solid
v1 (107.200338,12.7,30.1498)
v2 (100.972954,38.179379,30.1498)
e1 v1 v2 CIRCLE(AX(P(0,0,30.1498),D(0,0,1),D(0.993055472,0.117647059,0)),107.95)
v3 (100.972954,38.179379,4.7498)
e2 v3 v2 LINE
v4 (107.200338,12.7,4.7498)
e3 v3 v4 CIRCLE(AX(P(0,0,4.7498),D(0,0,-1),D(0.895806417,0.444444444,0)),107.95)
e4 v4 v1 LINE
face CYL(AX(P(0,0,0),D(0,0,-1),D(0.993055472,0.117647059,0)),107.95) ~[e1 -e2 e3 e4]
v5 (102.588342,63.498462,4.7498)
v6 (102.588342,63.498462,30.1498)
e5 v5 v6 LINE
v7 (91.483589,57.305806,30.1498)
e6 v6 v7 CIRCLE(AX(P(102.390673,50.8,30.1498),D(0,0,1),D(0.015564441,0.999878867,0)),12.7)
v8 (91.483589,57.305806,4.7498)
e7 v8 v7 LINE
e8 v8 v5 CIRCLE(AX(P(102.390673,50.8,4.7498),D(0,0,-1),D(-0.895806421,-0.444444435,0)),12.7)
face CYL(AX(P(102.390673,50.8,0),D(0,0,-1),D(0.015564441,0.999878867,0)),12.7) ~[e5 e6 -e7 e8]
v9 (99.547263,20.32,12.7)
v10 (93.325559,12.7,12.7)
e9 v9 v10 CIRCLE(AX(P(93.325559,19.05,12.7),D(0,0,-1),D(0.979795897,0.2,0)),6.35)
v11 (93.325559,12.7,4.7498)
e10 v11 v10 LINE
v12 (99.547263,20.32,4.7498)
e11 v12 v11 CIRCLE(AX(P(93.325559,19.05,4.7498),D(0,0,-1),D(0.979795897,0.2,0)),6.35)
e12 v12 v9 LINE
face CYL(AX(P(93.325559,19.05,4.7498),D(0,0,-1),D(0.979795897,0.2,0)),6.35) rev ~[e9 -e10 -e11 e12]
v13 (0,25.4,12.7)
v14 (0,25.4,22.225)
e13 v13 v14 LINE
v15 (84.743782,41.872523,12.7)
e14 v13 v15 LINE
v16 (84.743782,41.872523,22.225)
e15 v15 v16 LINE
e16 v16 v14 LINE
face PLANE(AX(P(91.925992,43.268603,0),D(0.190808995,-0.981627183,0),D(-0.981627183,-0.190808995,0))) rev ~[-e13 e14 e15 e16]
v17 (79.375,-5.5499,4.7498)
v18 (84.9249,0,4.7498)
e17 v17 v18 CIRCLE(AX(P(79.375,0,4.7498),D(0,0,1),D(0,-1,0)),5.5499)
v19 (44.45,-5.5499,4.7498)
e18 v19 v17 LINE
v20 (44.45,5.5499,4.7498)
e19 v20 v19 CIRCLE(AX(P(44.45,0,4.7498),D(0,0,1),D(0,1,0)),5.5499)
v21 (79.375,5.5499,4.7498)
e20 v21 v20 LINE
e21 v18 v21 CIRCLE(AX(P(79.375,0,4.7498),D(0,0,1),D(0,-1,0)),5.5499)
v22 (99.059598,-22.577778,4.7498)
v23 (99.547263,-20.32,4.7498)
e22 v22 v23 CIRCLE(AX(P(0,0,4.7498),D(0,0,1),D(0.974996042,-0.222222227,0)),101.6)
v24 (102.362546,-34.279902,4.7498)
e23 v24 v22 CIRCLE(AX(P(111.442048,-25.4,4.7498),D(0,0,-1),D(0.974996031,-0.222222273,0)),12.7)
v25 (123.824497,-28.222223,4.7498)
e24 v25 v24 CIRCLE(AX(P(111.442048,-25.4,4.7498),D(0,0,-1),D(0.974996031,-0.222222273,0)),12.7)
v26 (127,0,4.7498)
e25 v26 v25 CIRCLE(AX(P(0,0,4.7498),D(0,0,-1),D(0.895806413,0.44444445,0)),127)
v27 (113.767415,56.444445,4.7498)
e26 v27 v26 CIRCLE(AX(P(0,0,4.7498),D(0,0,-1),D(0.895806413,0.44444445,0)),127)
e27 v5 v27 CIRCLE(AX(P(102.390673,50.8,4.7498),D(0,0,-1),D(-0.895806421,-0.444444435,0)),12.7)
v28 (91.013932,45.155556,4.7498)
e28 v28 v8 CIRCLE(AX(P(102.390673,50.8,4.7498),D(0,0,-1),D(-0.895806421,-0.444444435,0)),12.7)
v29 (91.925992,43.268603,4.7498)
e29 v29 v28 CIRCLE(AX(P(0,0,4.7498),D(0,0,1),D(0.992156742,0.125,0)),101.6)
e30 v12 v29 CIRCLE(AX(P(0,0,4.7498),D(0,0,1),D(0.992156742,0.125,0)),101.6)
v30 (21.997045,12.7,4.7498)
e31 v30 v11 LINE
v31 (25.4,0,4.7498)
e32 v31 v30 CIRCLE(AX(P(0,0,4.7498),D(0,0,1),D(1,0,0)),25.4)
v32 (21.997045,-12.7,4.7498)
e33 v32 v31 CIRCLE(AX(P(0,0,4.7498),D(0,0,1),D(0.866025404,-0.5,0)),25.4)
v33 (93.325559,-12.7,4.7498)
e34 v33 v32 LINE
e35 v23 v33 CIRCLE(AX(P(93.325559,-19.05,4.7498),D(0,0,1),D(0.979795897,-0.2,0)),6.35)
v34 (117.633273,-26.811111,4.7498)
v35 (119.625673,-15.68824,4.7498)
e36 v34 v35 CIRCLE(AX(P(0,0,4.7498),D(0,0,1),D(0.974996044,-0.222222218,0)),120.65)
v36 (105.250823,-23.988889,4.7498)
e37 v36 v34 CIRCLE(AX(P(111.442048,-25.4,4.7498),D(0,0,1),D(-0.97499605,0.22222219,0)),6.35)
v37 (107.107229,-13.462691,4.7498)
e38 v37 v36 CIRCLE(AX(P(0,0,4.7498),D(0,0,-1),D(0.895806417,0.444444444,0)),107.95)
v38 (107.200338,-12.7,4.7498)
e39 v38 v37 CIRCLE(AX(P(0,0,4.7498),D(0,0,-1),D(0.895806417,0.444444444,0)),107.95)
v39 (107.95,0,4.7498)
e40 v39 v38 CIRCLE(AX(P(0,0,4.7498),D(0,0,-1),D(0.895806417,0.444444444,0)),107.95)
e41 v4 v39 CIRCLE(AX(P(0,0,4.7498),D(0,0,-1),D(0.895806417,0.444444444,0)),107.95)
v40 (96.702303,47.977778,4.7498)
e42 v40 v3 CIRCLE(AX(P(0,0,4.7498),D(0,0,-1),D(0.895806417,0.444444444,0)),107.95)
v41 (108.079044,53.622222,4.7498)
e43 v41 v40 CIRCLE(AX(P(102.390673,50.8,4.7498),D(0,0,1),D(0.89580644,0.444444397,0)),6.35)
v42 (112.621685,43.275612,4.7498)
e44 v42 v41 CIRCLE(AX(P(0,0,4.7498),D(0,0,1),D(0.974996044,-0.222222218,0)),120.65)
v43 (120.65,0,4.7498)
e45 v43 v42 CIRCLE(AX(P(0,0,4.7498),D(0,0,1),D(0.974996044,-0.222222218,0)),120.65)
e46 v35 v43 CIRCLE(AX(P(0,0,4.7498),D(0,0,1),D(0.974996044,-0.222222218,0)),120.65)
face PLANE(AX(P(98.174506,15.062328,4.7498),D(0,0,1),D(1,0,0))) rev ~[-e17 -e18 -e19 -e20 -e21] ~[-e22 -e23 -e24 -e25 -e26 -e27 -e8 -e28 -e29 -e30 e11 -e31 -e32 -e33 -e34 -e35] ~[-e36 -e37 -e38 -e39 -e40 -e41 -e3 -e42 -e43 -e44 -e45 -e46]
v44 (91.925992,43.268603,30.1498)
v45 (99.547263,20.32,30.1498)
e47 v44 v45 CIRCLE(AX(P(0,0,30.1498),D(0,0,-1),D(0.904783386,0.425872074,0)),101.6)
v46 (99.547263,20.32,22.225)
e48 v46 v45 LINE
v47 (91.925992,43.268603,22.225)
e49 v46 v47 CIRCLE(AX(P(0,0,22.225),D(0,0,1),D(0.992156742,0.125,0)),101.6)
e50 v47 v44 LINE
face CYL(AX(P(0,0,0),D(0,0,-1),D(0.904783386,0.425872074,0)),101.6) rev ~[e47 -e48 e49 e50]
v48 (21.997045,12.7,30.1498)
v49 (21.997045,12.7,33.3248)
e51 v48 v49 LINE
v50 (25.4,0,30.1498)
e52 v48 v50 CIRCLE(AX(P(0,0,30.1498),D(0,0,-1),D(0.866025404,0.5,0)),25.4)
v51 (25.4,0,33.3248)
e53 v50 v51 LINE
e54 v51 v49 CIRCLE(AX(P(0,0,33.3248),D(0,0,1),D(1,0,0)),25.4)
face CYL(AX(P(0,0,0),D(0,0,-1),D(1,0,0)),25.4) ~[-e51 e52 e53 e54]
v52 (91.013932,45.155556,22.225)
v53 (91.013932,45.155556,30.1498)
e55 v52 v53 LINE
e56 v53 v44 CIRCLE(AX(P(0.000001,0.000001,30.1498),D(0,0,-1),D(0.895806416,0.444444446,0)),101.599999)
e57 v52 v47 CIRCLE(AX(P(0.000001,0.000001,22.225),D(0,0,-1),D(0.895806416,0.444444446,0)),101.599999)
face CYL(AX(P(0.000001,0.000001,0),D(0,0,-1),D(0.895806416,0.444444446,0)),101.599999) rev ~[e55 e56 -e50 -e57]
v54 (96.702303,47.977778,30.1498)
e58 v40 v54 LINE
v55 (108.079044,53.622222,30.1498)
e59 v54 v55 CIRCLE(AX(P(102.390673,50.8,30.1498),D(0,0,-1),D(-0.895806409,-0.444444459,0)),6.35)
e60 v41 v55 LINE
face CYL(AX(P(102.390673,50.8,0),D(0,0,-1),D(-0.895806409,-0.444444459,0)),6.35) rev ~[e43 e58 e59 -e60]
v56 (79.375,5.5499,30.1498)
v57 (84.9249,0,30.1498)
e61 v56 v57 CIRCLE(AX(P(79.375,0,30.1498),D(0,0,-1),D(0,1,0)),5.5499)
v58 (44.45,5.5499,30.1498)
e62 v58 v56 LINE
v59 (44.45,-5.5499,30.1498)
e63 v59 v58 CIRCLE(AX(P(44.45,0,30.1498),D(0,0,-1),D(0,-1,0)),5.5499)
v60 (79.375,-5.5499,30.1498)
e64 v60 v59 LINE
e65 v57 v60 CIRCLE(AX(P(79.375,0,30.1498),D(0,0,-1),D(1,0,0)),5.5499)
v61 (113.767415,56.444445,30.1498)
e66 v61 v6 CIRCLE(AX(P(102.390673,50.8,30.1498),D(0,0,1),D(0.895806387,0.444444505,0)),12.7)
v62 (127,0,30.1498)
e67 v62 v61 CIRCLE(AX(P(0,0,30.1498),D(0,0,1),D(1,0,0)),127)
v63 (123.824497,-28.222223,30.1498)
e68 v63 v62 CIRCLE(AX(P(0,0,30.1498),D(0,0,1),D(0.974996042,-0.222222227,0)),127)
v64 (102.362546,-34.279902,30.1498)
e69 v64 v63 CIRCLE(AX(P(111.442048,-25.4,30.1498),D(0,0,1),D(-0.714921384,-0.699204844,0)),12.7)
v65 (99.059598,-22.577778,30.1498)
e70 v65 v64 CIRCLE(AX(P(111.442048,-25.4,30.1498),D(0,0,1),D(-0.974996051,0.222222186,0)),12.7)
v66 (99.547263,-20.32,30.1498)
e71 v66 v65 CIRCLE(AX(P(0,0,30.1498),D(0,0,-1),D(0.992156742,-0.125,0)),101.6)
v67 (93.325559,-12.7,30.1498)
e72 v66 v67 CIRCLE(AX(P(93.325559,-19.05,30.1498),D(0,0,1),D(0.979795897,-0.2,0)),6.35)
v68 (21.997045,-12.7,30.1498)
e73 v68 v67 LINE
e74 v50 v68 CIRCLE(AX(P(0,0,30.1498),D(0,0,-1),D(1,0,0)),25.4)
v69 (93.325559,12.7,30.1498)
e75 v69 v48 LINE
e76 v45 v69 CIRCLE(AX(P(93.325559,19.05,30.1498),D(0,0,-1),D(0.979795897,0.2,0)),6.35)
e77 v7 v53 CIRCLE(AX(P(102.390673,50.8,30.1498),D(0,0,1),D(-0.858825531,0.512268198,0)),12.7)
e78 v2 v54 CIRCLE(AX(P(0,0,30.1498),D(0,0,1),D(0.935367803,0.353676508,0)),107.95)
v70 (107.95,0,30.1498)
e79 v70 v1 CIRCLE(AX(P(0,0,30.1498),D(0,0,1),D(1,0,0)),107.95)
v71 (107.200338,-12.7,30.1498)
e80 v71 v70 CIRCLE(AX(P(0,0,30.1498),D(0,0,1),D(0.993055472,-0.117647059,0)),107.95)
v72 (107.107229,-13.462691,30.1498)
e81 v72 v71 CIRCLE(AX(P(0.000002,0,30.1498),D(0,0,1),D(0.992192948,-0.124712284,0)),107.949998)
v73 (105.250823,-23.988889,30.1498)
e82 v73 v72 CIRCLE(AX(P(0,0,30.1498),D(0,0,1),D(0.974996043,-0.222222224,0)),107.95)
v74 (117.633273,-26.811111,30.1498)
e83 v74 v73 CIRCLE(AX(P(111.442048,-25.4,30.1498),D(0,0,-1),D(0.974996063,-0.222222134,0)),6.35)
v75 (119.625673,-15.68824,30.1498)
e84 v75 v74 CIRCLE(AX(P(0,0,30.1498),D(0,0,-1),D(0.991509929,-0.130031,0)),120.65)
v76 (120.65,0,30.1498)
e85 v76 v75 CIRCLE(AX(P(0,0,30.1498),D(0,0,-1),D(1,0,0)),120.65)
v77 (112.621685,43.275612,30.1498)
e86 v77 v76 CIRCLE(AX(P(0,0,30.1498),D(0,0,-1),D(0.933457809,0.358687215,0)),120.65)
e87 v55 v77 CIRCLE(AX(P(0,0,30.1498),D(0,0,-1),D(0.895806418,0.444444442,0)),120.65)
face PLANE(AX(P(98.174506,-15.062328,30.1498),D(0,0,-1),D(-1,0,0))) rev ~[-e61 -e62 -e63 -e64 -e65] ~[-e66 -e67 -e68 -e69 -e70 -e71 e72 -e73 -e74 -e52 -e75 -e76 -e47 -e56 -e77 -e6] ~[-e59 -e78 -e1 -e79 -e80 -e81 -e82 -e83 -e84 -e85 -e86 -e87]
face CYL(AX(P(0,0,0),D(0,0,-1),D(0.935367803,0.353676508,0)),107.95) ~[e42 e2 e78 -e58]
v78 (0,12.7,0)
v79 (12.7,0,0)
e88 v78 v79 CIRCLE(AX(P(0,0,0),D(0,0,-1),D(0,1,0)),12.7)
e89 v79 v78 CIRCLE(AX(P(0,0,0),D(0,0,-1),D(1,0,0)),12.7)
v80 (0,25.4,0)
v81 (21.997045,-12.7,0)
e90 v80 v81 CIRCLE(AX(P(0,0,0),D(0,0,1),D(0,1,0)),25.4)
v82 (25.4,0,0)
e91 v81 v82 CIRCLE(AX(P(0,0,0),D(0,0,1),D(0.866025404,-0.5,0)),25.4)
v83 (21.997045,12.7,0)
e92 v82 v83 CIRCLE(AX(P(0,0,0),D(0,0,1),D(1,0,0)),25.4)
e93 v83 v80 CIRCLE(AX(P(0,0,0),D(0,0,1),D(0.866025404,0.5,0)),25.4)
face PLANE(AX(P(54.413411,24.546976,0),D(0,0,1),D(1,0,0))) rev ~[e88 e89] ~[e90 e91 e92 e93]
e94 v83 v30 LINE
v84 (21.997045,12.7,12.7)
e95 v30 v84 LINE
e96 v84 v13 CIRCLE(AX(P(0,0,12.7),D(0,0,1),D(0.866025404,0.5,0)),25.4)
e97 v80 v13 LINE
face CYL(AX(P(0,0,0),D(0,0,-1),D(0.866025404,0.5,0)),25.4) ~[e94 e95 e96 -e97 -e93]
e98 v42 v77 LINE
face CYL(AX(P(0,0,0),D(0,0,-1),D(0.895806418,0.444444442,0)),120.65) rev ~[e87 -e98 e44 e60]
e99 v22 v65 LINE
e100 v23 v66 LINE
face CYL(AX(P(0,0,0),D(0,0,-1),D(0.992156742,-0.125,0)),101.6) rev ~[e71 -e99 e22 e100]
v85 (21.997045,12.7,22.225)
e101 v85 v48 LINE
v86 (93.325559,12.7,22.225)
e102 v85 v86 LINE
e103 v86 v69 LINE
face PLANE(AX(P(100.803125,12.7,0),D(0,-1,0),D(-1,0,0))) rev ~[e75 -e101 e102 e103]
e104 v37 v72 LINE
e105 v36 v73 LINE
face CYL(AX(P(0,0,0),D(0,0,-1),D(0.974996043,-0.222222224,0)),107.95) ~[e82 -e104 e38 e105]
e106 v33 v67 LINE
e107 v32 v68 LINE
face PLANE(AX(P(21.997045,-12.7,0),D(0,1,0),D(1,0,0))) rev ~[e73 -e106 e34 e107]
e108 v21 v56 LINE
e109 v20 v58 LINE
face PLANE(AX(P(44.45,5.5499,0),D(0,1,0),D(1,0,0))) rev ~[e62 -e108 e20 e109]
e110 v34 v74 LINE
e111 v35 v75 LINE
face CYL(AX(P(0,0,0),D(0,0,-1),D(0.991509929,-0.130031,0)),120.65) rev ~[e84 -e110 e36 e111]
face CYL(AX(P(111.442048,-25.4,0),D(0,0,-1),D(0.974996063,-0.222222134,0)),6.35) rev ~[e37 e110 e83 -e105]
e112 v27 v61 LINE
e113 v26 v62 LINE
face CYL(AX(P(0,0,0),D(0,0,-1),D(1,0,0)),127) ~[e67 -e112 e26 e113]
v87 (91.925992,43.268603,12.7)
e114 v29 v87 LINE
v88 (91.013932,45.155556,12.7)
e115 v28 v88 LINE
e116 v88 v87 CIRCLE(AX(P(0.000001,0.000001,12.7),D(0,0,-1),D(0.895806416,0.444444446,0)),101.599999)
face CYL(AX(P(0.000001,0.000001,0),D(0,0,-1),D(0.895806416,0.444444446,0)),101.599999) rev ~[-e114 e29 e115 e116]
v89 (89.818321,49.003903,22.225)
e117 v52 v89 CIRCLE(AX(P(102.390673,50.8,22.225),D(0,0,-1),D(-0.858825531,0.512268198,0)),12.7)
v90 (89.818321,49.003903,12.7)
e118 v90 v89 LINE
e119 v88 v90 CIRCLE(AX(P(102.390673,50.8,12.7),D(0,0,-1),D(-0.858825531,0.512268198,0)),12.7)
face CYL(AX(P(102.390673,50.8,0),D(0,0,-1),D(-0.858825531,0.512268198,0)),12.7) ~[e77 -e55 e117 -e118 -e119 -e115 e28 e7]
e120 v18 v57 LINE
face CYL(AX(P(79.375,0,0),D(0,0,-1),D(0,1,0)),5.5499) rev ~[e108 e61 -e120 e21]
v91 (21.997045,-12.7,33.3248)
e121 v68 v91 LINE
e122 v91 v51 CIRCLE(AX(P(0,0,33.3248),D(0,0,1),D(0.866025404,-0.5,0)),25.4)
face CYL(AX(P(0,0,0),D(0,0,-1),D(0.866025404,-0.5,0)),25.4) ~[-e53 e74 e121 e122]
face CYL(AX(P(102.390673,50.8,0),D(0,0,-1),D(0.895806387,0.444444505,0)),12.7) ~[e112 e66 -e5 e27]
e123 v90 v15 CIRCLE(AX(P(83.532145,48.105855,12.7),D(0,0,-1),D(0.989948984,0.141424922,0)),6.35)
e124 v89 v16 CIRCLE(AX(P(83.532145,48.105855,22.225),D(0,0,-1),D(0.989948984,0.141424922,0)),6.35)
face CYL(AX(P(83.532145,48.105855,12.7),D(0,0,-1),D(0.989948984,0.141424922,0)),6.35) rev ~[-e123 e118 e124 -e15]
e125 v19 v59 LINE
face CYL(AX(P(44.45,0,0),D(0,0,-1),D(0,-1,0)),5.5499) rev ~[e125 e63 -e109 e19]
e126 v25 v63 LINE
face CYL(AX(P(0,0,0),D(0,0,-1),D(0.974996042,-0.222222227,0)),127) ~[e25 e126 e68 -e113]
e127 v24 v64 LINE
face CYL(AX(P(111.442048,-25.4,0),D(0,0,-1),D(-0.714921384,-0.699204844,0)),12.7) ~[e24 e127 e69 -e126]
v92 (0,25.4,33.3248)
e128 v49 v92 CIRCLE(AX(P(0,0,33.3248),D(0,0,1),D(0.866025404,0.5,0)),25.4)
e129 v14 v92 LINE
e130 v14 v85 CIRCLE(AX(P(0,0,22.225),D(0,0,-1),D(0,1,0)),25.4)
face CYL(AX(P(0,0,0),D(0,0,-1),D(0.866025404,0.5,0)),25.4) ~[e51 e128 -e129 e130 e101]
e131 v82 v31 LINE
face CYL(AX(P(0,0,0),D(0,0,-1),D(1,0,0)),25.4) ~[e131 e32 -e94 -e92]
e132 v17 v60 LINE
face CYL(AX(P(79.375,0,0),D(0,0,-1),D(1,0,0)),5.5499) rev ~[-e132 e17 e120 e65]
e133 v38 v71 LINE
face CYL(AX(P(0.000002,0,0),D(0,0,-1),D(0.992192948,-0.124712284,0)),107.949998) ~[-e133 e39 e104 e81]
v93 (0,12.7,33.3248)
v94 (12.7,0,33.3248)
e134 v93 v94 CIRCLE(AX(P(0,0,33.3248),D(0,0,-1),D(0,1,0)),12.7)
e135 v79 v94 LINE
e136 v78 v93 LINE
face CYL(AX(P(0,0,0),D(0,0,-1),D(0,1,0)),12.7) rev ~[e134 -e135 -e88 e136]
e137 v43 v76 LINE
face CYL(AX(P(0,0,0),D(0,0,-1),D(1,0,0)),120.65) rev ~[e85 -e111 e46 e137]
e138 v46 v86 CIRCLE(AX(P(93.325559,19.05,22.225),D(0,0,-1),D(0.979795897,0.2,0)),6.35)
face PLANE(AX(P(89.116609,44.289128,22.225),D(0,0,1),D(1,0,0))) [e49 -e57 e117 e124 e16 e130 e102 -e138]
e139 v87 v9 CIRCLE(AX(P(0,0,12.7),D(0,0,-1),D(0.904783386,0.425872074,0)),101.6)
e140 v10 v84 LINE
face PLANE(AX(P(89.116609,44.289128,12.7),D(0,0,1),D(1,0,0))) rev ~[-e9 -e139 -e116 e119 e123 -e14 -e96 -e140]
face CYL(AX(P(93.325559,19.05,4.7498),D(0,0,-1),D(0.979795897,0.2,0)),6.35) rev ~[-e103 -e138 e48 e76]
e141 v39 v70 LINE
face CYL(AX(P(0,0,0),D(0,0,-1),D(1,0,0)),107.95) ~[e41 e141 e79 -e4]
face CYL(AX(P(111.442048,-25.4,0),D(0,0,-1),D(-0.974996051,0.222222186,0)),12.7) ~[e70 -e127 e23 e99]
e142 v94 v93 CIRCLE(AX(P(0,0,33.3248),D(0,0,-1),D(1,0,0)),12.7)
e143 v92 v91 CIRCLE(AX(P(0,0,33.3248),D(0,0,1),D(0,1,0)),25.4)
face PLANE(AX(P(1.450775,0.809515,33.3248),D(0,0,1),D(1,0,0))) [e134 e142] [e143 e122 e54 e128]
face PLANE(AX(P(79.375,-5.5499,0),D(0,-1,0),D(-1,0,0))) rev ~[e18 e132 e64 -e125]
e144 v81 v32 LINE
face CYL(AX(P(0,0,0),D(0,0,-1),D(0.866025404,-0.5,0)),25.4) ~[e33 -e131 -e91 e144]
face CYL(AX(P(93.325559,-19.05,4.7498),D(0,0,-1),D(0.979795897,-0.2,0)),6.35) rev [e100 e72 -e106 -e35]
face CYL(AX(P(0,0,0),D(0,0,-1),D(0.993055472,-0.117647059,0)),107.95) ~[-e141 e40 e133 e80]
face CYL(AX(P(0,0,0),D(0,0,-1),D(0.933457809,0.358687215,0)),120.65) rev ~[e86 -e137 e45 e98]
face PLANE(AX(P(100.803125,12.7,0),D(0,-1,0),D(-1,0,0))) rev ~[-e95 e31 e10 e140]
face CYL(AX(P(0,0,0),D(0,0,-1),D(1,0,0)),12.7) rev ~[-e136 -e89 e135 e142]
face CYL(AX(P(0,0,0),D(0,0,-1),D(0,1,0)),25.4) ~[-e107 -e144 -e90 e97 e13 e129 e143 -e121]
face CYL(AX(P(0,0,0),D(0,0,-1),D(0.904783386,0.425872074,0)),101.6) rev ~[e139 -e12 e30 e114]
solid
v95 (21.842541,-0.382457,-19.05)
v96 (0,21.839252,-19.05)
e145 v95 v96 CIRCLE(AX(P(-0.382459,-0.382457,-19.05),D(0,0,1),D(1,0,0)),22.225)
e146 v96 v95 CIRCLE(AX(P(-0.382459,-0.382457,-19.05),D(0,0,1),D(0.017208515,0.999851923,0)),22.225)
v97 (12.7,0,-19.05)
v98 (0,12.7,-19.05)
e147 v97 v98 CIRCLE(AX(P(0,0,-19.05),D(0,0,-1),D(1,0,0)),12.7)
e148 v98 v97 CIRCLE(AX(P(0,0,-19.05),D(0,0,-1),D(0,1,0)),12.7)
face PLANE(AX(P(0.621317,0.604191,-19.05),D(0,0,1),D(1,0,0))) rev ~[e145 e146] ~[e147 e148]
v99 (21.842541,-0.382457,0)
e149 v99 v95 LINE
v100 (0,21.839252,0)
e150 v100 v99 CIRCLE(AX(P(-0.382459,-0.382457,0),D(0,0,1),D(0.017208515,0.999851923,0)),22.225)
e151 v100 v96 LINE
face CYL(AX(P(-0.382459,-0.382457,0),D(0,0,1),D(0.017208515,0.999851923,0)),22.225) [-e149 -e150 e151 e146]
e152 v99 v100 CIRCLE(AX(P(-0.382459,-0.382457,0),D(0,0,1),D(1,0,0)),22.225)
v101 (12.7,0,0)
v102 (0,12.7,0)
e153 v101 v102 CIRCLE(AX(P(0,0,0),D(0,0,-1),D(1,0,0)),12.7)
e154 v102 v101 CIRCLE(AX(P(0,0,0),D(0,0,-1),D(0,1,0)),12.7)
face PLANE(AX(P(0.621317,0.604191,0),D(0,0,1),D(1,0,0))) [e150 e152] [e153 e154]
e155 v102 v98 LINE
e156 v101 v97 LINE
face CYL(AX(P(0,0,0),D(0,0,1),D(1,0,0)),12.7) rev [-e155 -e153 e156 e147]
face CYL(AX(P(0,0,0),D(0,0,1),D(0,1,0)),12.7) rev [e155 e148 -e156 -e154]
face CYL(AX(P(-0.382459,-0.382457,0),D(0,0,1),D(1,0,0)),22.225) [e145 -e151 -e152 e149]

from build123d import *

# Parameters (mm, degrees)
F1_DEPTH     = 33.3248
F2_DEPTH     = 19.05
F3_DEPTH     = 30.1498
F5_DEPTH     = 4.7498
F6_DEPTH     = 22.225
F8_DEPTH     = 12.7
F9_T1_DEPTH  = 9.525
F9_T3_DEPTH  = 25.4
F9_T8_DEPTH  = 27.2571917505
F9_T13_DEPTH = 27.2317917505


# Not quite as in the source:
# - a fillet or chamfer that OpenCascade refuses, or shapes differently, is made with other operations: its cross-section is extruded or revolved along the edge and cut away or added


with BuildPart() as f1:
    # F0 (on Top) → F1 (new body)
    with BuildSketch(Plane.XY):
        with BuildLine():
            ThreePointArc((21.9970452561, 12.7), (12.7, 21.9970452561), (0, 25.4))
            ThreePointArc((0, 25.4), (-21.9970452561, -12.7), (21.9970452561, -12.7))
            ThreePointArc((21.9970452561, -12.7), (24.5345159877, -6.5740037456), (25.4, 0))
            ThreePointArc((25.4, 0), (24.5345159877, 6.5740037456), (21.9970452561, 12.7))
        make_face()
        with BuildLine():
            ThreePointArc((21.8425407432, -0.3824569867), (-16.232550455, -15.9620986388), (0, 21.8392519916))
            ThreePointArc((0, 21.8392519916), (15.4676319414, 15.1971846654), (21.8425407432, -0.3824569867))
        make_face(mode=Mode.SUBTRACT)
        with BuildLine():
            ThreePointArc((21.8425407432, -0.3824569867), (15.4676319414, 15.1971846654), (0, 21.8392519916))
            ThreePointArc((0, 21.8392519916), (-16.232550455, -15.9620986388), (21.8425407432, -0.3824569867))
        make_face()
        with BuildLine():
            ThreePointArc((0, 12.7), (8.9802561211, 8.9802561211), (12.7, 0))
            ThreePointArc((12.7, 0), (-8.9802561211, -8.9802561211), (0, 12.7))
        make_face(mode=Mode.SUBTRACT)
    extrude(amount=F1_DEPTH)

    # F0 (on Top) → F3 (join)
    with BuildSketch(Plane.XY):
        with BuildLine():
            Line((25.4, 12.7), (21.9970452561, 12.7))
            ThreePointArc((21.9970452561, 12.7), (24.5345159877, 6.5740037456), (25.4, 0))
            ThreePointArc((25.4, 0), (24.5345159877, -6.5740037456), (21.9970452561, -12.7))
            Line((21.9970452561, -12.7), (25.4, -12.7))
            Line((25.4, -12.7), (100.8031249516, -12.7))
            ThreePointArc((100.8031249516, -12.7), (101.4005855384, -6.3624879144), (101.6, 0))
            ThreePointArc((101.6, 0), (101.4005855384, 6.3624879144), (100.8031249516, 12.7))
            Line((100.8031249516, 12.7), (25.4, 12.7))
        make_face()
        with BuildLine():
            ThreePointArc((44.45, -5.5499), (38.9001, 0), (44.45, 5.5499))
            Line((44.45, 5.5499), (79.375, 5.5499))
            ThreePointArc((79.375, 5.5499), (83.2993719249, 3.9243719249), (84.9249, 0))
            ThreePointArc((84.9249, 0), (83.2993719249, -3.9243719249), (79.375, -5.5499))
            Line((79.375, -5.5499), (44.45, -5.5499))
        make_face(mode=Mode.SUBTRACT)
        with BuildLine():
            Line((107.2003381525, 12.7), (100.8031249516, 12.7))
            ThreePointArc((100.8031249516, 12.7), (101.4005855384, 6.3624879144), (101.6, 0))
            ThreePointArc((101.6, 0), (101.4005855384, -6.3624879144), (100.8031249516, -12.7))
            Line((100.8031249516, -12.7), (107.2003381525, -12.7))
            ThreePointArc((107.2003381525, -12.7), (107.762421566, -6.3610532321), (107.95, 0))
            ThreePointArc((107.95, 0), (107.762421566, 6.3610532321), (107.2003381525, 12.7))
        make_face()
        with BuildLine():
            ThreePointArc((91.0139318516, 45.1555556815), (91.4748276183, 44.2144310402), (91.9259920573, 43.2686027539))
            ThreePointArc((91.9259920573, 43.2686027539), (97.5691447351, 28.3341136382), (100.8031249516, 12.7))
            Line((100.8031249516, 12.7), (107.2003381525, 12.7))
            ThreePointArc((107.2003381525, 12.7), (104.8633855035, 25.6295314189), (100.9729543694, 38.1793790668))
            ThreePointArc((100.9729543694, 38.1793790668), (95.1042946416, 40.3981403326), (91.0139318516, 45.1555556815))
        make_face()
        with BuildLine():
            ThreePointArc((91.4835891574, 57.3058061184), (89.7001505826, 51.2905410623), (91.0139318516, 45.1555556815))
            ThreePointArc((91.0139318516, 45.1555556815), (95.1042946416, 40.3981403326), (100.9729543694, 38.1793790668))
            ThreePointArc((100.9729543694, 38.1793790668), (98.95897619, 43.1314679952), (96.7023027034, 47.9777776879))
            ThreePointArc((96.7023027034, 47.9777776879), (94.2084683161, 52.7064227352), (91.4835891574, 57.3058061184))
        make_face()
        with BuildLine():
            ThreePointArc((102.5883418008, 63.4984616078), (96.2051950503, 61.8918825067), (91.4835891574, 57.3058061184))
            ThreePointArc((91.4835891574, 57.3058061184), (94.2084683161, 52.7064227352), (96.7023027034, 47.9777776879))
            ThreePointArc((96.7023027034, 47.9777776879), (99.5684512872, 56.4883707973), (108.0790442979, 53.6222219202))
            ThreePointArc((108.0790442979, 53.6222219202), (105.4493808375, 58.6246584723), (102.5883418008, 63.4984616078))
        make_face()
        with BuildLine():
            ThreePointArc((113.7674145133, 56.4444452091), (109.1679535141, 61.5405062404), (102.5883418008, 63.4984616078))
            ThreePointArc((102.5883418008, 63.4984616078), (105.4493808375, 58.6246584723), (108.0790442979, 53.6222219202))
            ThreePointArc((108.0790442979, 53.6222219202), (110.4715620752, 48.5021285374), (112.6216847045, 43.2756124663))
            ThreePointArc((112.6216847044, 43.2756124663), (114.4576498997, 46.8404446919), (115.0906734034, 50.8))
            ThreePointArc((115.0906734034, 50.8), (114.7554340581, 53.6987400629), (113.7674145133, 56.4444452091))
        make_face()
        with BuildLine():
            ThreePointArc((115.0906734034, 50.8), (114.4576498997, 46.8404446919), (112.6216847044, 43.2756124663))
            ThreePointArc((112.6216847045, 43.2756124663), (118.6259431145, 22.0070016178), (120.65, 0))
            ThreePointArc((120.65, 0), (120.3936458808, -7.8608225729), (119.625672913, -15.6882401853))
            ThreePointArc((119.625672913, -15.6882401853), (122.957733543, -20.0447240945), (124.1420477199, -25.4))
            ThreePointArc((124.1420477199, -25.4), (124.0624104306, -26.8200158629), (123.8244973181, -28.2222228733))
            ThreePointArc((123.8244973181, -28.2222228733), (126.2036274427, -14.2001556434), (127, 0))
            ThreePointArc((127, 0), (123.6476074236, 28.9873968891), (113.7674145133, 56.4444452091))
            ThreePointArc((113.7674145133, 56.4444452091), (114.7554340581, 53.6987400629), (115.0906734034, 50.8))
        make_face()
        with BuildLine():
            ThreePointArc((124.1420477199, -25.4), (122.957733543, -20.0447240945), (119.625672913, -15.6882401853))
            ThreePointArc((119.625672913, -15.6882401853), (118.759763313, -21.2730138401), (117.6332727213, -26.8111105491))
            ThreePointArc((117.6332727213, -26.8111105491), (116.2486727134, -32.2903792542), (114.6090014612, -37.6987968517))
            ThreePointArc((114.6090014612, -37.6987968517), (120.546845886, -34.2539624098), (123.8244973181, -28.2222228733))
            ThreePointArc((123.8244973181, -28.2222228733), (124.0624104306, -26.8200158629), (124.1420477199, -25.4))
        make_face()
        with BuildLine():
            ThreePointArc((105.2508227996, -23.988889095), (103.9341328656, -29.1701649887), (102.3625461374, -34.2799015205))
            ThreePointArc((102.3625461374, -34.2799015205), (108.0271148048, -37.6322619815), (114.6090014612, -37.6987968517))
            ThreePointArc((114.6090014612, -37.6987968517), (116.2486727134, -32.2903792542), (117.6332727213, -26.8111105491))
            ThreePointArc((117.6332727213, -26.8111105491), (110.0309369928, -31.5912249609), (105.2508227996, -23.988889095))
        make_face()
        with BuildLine():
            ThreePointArc((107.1072287434, -13.462691072), (101.9216499986, -16.9945239737), (99.0595978685, -22.5777782371))
            ThreePointArc((99.0595978685, -22.5777782371), (99.2195781588, -28.8498170717), (102.3625461374, -34.2799015205))
            ThreePointArc((102.3625461374, -34.2799015205), (103.9341328656, -29.1701649887), (105.2508227996, -23.988889095))
            ThreePointArc((105.2508227996, -23.988889095), (106.309386815, -18.7487806272), (107.1072287434, -13.462691072))
        make_face()
        with BuildLine():
            Line((107.2003381525, -12.7), (100.8031249516, -12.7))
            ThreePointArc((100.8031249516, -12.7), (100.0533338724, -17.6604184834), (99.0595978685, -22.5777782371))
            ThreePointArc((99.0595978685, -22.5777782371), (101.9216499986, -16.9945239737), (107.1072287434, -13.462691072))
            ThreePointArc((107.1072287434, -13.462691072), (107.1544620239, -13.0814283766), (107.2003381525, -12.7))
        make_face()
    extrude(amount=F3_DEPTH)

    # F4 (on face) → F5 (cut)
    with BuildSketch(Plane(origin=(0, 0, 0), x_dir=(1, 0, 0), z_dir=(0, 0, -1))):
        with BuildLine():
            ThreePointArc((21.9970452561, 12.7), (24.5345159877, 6.5740037456), (25.4, 0))
            ThreePointArc((25.4, 0), (24.5345159877, -6.5740037456), (21.9970452561, -12.7))
            Line((21.9970452561, -12.7), (100.8031249516, -12.7))
            ThreePointArc((100.8031249516, -12.7), (97.2717152815, -29.3389401), (91.0139318516, -45.1555556815))
            ThreePointArc((91.0139318516, -45.1555556815), (96.7462286396, -62.1767413308), (113.7674145133, -56.4444452091))
            ThreePointArc((113.7674145133, -56.4444452091), (126.1134025906, -14.9803099778), (123.8244973181, 28.2222228733))
            ThreePointArc((123.8244973181, 28.2222228733), (108.6198254018, 37.7824497248), (99.0595978685, 22.5777782371))
            ThreePointArc((99.0595978685, 22.5777782371), (100.0533338724, 17.6604184834), (100.8031249516, 12.7))
            Line((100.8031249516, 12.7), (21.9970452561, 12.7))
        make_face()
        with BuildLine():
            Line((44.45, 5.5499), (79.375, 5.5499))
            ThreePointArc((79.375, 5.5499), (84.9249, 0), (79.375, -5.5499))
            Line((79.375, -5.5499), (44.45, -5.5499))
            ThreePointArc((44.45, -5.5499), (38.9001, 0), (44.45, 5.5499))
        make_face(mode=Mode.SUBTRACT)
        with BuildLine():
            ThreePointArc((117.6332727213, 26.8111105491), (119.8077324573, -14.23129451), (108.0790442979, -53.6222219202))
            ThreePointArc((108.0790442979, -53.6222219202), (99.5684512872, -56.4883707973), (96.7023027034, -47.9777776879))
            ThreePointArc((96.7023027034, -47.9777776879), (107.1963922297, -12.7332632479), (105.2508227996, 23.988889095))
            ThreePointArc((105.2508227996, 23.988889095), (110.0309369928, 31.5912249609), (117.6332727213, 26.8111105491))
        make_face(mode=Mode.SUBTRACT)
    extrude(amount=-F5_DEPTH, mode=Mode.SUBTRACT)

    # F0 (on Top) → F6 (join)
    with BuildSketch(Plane.XY):
        with BuildLine():
            Line((91.9259920573, 43.2686027539), (0, 25.4))
            ThreePointArc((0, 25.4), (12.7, 21.9970452561), (21.9970452561, 12.7))
            Line((21.9970452561, 12.7), (25.4, 12.7))
            Line((25.4, 12.7), (100.8031249516, 12.7))
            ThreePointArc((100.8031249516, 12.7), (97.5691447351, 28.3341136382), (91.9259920573, 43.2686027539))
        make_face()
    extrude(amount=F6_DEPTH)

    # F7 (on face) → F8 (cut)
    with BuildSketch(Plane(origin=(0, 0, 0), x_dir=(1, 0, 0), z_dir=(0, 0, -1))):
        with BuildLine():
            Line((100.8031249516, -12.7), (21.9970452561, -12.7))
            ThreePointArc((21.9970452561, -12.7), (12.7, -21.9970452561), (0, -25.4))
            Line((0, -25.4), (91.9259920573, -43.2686027539))
            ThreePointArc((91.9259920573, -43.2686027539), (97.5691447351, -28.3341136382), (100.8031249516, -12.7))
        make_face()
    extrude(amount=-F8_DEPTH, mode=Mode.SUBTRACT)

    # F9: fillet of radius 6.35 on 4 edges, made by hand

    # F9_s2 → F9_t1 (join)
    with BuildSketch(Plane.XY.offset(12.7)):
        with BuildLine():
            ThreePointArc((89.8183213038, 49.0039034869), (88.7059686824, 44.4242725365), (84.7437823747, 41.8725226155))
            Line((84.7437823747, 41.8725226155), (84.8649460867, 41.249189354))
            Line((84.8649460867, 41.249189354), (92.0471557694, 42.6452694924))
            Line((92.0471557694, 42.6452694924), (92.5005295077, 43.5390315211))
            ThreePointArc((92.5005295077, 43.5390315211), (91.5827689292, 45.4377778974), (90.4469389088, 49.0937083126))
            Line((90.4469389088, 49.0937083126), (89.8183213038, 49.0039034869))
        make_face()
    extrude(amount=F9_T1_DEPTH)

    # F9_s4 → F9_t3 (join)
    with BuildSketch(Plane.XY.offset(4.7498)):
        with BuildLine():
            ThreePointArc((99.5472631467, -20.32), (98.2442480497, -15.0339073716), (93.3255592, -12.7))
            Line((93.3255592, -12.7), (100.8031249516, -12.7))
            ThreePointArc((100.8031249516, -12.7), (100.247621432, -16.5219368483), (99.5472631467, -20.32))
        make_face()
    extrude(amount=F9_T3_DEPTH)


with BuildPart() as f2:
    # F0 (on Top) → F2 (new body)
    with BuildSketch(Plane.XY):
        with BuildLine():
            ThreePointArc((21.8425407432, -0.3824569867), (15.4676319414, 15.1971846654), (0, 21.8392519916))
            ThreePointArc((0, 21.8392519916), (-16.232550455, -15.9620986388), (21.8425407432, -0.3824569867))
        make_face()
        with BuildLine():
            ThreePointArc((0, 12.7), (8.9802561211, 8.9802561211), (12.7, 0))
            ThreePointArc((12.7, 0), (-8.9802561211, -8.9802561211), (0, 12.7))
        make_face(mode=Mode.SUBTRACT)
    extrude(amount=-F2_DEPTH)


with BuildPart() as f9_tool6:
    # F9_s7 → F9_t8 (new body)
    with BuildSketch(Plane.XY.offset(4.7498)):
        with BuildLine():
            ThreePointArc((99.5472631467, 20.32), (98.2442480497, 15.0339073716), (93.3255592, 12.7))
            Line((93.3255592, 12.7), (100.8031249516, 12.7))
            ThreePointArc((100.8031249516, 12.7), (100.247621432, 16.5219368483), (99.5472631467, 20.32))
        make_face()
    extrude(amount=F9_T8_DEPTH)

    split(bisect_by=Plane.XY.offset(30.1498), keep=Keep.BOTTOM)


with BuildPart() as f1_1:
    add(f1.part)

    # F9_t5: union F9_tool6
    add(f9_tool6.part)


with BuildPart() as f9_tool11:
    # F9_s12 → F9_t13 (new body)
    with BuildSketch(Plane.XY.offset(2.9180082495)):
        with BuildLine():
            ThreePointArc((99.5472631467, 20.32), (98.2442480497, 15.0339073716), (93.3255592, 12.7))
            Line((93.3255592, 12.7), (100.8031249516, 12.7))
            ThreePointArc((100.8031249516, 12.7), (100.247621432, 16.5219368483), (99.5472631467, 20.32))
        make_face()
    extrude(amount=F9_T13_DEPTH)

    split(bisect_by=Plane.XY.offset(4.7498), keep=Keep.TOP)


with BuildPart() as f1_2:
    add(f1_1.part)

    # F9_t10: union F9_tool11
    add(f9_tool11.part)


solid = Compound([f2.part, f1_2.part])
